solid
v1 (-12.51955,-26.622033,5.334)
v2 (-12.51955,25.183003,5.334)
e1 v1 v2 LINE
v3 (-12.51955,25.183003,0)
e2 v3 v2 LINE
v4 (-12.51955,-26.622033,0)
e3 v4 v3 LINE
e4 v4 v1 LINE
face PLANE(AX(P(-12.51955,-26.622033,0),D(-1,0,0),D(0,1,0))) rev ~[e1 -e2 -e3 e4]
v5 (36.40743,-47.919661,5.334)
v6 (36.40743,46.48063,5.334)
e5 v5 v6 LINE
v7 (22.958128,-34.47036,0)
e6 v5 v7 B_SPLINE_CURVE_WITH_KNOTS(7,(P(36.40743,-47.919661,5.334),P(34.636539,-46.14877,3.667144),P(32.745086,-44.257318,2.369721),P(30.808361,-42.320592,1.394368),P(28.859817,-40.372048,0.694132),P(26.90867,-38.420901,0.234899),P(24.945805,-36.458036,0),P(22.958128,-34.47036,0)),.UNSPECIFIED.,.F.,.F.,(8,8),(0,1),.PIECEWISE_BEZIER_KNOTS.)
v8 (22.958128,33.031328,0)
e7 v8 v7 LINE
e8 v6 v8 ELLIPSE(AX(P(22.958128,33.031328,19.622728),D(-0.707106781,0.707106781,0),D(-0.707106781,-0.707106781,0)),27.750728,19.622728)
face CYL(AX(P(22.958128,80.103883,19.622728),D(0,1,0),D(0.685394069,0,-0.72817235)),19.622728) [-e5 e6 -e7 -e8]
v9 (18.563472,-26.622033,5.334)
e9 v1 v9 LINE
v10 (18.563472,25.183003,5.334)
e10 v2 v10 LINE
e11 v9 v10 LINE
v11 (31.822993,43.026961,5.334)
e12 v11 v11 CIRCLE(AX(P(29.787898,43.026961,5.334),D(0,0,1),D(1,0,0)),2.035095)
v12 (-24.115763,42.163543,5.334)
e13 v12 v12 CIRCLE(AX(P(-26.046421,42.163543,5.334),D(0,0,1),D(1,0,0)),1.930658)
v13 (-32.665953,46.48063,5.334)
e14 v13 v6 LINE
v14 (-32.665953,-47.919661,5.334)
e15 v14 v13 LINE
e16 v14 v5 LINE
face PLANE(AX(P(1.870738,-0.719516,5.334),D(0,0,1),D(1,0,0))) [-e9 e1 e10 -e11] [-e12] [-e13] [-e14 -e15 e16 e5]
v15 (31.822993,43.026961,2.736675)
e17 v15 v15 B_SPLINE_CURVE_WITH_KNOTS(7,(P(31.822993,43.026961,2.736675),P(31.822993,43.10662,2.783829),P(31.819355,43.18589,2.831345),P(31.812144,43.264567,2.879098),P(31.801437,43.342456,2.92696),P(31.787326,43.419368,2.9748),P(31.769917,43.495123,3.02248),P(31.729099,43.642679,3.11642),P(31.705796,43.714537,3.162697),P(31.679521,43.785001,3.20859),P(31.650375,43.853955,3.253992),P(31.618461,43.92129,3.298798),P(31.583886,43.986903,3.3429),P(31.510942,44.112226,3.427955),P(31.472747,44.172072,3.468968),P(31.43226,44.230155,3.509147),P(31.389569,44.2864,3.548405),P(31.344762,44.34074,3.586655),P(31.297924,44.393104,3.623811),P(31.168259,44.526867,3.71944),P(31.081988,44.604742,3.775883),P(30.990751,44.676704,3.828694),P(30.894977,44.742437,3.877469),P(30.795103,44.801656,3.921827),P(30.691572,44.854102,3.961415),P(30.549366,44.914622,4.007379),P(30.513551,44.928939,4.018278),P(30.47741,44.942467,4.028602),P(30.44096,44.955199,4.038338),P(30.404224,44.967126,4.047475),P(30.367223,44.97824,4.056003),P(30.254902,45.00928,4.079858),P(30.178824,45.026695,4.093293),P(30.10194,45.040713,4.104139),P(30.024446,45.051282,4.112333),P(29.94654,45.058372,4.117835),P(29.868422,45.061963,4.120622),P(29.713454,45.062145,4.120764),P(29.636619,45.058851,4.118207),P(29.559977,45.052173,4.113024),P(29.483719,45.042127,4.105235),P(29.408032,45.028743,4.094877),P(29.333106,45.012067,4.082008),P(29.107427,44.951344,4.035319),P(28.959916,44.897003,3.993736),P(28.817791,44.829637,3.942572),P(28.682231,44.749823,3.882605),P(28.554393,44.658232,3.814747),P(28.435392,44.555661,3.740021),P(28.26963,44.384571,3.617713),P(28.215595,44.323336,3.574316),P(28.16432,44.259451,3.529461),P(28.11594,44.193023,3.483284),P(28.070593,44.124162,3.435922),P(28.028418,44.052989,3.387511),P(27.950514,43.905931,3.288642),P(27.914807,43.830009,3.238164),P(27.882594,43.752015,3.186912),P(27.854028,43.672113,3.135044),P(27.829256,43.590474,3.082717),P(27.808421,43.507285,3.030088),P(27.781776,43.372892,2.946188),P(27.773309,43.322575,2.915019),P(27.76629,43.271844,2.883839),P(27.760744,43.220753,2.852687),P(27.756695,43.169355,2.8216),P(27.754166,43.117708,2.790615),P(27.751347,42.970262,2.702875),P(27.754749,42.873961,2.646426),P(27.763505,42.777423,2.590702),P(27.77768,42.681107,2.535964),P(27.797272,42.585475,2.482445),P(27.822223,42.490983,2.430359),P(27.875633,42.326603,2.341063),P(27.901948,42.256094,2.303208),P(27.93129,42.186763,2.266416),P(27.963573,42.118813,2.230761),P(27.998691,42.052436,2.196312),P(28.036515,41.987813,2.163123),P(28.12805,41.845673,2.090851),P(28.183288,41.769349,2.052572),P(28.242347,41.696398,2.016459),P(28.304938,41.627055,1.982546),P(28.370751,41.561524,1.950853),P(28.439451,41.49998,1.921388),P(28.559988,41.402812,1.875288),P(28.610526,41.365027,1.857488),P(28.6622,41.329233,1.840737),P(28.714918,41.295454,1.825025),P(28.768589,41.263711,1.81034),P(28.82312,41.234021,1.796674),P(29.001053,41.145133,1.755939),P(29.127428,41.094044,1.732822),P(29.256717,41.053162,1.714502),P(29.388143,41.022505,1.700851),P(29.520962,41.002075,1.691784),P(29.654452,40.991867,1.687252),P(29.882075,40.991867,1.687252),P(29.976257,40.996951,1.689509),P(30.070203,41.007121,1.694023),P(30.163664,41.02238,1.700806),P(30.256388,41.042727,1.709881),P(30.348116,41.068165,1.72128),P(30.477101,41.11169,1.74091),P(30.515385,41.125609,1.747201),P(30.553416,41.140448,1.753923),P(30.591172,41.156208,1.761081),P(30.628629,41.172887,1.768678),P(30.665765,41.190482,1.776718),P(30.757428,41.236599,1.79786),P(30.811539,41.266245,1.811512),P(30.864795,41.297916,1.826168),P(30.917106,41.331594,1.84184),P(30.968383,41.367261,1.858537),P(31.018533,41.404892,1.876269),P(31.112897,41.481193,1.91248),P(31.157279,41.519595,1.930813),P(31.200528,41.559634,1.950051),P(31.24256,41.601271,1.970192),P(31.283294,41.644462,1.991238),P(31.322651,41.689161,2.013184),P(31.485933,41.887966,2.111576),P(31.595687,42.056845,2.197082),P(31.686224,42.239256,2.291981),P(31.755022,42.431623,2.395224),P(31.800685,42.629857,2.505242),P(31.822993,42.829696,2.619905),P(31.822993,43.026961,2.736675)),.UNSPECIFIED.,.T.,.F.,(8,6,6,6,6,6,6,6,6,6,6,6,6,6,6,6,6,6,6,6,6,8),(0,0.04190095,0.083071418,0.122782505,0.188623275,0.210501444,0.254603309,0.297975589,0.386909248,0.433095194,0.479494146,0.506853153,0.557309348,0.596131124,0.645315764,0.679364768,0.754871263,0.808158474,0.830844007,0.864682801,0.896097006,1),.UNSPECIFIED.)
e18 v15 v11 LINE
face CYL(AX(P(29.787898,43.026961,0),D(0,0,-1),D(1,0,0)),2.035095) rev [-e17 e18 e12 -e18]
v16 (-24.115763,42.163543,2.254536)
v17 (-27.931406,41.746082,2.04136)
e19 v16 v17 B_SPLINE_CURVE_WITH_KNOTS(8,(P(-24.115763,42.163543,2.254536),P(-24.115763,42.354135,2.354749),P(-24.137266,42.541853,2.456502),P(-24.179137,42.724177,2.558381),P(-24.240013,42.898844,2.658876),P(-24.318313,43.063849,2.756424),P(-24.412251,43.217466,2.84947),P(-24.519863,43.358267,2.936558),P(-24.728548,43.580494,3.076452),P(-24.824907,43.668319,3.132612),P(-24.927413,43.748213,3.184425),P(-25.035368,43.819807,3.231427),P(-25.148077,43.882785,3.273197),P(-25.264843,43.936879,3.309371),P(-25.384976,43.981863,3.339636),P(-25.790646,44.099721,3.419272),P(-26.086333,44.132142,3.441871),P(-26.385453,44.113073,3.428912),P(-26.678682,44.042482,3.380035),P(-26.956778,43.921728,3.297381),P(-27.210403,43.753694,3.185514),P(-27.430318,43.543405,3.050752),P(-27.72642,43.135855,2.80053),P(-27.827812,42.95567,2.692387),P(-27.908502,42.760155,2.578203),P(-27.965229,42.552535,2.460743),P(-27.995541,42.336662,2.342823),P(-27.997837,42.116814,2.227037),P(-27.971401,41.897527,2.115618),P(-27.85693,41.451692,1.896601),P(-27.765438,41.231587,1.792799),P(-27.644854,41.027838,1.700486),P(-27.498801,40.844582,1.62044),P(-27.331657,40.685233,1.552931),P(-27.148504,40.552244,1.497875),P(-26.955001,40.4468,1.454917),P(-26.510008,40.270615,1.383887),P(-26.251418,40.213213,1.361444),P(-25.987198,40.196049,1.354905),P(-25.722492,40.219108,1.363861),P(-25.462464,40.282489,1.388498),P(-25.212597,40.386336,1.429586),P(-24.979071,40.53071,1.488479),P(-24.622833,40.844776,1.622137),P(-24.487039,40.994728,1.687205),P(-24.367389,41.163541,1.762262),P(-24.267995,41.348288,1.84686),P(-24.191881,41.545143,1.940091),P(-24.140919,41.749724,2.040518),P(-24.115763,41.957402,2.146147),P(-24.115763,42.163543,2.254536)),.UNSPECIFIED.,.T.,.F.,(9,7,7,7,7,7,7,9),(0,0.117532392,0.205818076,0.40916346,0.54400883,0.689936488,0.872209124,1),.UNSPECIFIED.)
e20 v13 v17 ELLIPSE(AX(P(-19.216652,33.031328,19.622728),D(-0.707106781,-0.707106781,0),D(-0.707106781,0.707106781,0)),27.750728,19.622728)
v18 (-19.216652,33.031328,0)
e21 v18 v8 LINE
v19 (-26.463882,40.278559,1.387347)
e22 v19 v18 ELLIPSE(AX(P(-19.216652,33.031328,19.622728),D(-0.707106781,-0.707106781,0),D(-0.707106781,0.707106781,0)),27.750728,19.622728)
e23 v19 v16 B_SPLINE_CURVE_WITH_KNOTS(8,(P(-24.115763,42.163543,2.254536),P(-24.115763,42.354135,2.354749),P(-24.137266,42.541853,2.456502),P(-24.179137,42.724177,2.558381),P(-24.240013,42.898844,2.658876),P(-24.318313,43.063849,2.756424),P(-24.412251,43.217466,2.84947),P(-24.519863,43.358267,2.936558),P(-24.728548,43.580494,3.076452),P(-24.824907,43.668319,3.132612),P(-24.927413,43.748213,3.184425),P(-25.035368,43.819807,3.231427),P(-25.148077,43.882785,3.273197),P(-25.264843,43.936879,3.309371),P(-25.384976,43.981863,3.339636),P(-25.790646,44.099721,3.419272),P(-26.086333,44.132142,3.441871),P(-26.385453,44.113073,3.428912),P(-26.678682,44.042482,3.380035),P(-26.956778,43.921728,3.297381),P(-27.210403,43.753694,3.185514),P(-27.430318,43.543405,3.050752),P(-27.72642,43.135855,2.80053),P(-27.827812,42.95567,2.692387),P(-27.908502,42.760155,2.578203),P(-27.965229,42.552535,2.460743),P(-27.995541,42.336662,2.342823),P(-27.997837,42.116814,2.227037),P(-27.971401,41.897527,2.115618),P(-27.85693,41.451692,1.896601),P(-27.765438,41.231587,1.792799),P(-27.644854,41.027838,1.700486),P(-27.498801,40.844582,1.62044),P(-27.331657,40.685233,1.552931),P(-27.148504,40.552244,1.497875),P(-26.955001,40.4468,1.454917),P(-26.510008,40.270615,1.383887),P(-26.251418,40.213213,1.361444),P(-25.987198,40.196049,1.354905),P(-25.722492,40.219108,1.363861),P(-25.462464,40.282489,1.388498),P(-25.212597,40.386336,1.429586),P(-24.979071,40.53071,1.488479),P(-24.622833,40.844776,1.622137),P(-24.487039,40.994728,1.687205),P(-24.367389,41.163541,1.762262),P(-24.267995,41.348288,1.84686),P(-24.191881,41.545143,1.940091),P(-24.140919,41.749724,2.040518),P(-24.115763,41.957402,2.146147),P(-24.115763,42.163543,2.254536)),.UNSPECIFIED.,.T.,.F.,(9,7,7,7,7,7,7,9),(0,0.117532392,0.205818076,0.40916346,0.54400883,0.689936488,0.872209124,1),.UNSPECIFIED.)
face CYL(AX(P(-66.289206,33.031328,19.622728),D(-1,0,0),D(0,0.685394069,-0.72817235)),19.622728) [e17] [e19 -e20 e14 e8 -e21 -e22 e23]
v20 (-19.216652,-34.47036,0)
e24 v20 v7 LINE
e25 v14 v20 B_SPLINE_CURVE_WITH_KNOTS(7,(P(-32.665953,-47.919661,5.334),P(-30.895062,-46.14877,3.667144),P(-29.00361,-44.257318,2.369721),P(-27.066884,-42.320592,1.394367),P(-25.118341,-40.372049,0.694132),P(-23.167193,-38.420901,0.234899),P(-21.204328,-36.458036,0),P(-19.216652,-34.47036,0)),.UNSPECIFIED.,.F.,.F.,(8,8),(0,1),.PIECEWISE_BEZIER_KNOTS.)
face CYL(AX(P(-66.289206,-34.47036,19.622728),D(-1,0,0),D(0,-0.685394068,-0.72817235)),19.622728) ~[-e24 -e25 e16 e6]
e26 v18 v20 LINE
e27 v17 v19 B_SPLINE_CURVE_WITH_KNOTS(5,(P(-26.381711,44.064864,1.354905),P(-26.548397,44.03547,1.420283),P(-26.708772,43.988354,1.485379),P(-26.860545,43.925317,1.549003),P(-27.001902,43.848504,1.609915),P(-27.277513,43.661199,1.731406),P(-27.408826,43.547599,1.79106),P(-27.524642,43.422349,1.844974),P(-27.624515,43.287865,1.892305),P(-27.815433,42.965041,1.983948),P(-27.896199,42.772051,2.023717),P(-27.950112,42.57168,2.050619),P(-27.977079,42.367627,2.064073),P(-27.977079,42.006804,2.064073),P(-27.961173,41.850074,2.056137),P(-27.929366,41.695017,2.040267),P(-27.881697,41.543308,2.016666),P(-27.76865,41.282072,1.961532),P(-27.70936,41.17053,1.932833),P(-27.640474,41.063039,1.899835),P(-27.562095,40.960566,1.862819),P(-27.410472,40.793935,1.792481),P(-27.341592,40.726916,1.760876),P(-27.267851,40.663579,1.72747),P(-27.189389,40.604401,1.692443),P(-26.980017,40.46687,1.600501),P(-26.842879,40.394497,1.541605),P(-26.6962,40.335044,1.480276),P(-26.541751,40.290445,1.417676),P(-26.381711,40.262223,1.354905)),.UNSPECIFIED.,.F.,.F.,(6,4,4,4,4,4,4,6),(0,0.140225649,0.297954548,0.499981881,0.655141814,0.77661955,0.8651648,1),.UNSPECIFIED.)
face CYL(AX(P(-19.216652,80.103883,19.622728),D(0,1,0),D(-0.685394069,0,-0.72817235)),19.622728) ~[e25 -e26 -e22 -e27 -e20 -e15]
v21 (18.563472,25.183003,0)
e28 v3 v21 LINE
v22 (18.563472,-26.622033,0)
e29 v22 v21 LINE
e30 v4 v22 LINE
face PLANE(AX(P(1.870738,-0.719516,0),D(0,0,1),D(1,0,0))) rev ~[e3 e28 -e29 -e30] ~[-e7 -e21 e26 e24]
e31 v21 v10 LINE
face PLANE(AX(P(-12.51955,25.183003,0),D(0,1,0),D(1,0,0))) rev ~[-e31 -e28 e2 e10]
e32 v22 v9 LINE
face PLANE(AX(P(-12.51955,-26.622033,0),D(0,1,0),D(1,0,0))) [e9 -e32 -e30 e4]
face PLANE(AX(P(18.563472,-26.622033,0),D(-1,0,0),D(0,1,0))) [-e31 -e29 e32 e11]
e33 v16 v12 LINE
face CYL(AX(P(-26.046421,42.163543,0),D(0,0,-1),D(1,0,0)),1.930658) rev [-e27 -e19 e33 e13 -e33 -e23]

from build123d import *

# Parameters (mm, degrees)
F0_W        = 69.0733827651
F0_H        = 94.4002903998
F0_R        = 1.9306579711
F0_W_2      = 31.083021313
F0_H_2      = 51.8050361425
F0_R_2      = 2.0350948247
F1_DEPTH    = 5.334
F2_T1_DEPTH = 136.319889095
F2_T3_DEPTH = 161.6467967298


# Not quite as in the source:
# - a fillet or chamfer that OpenCascade refuses, or shapes differently, is made with other operations: its cross-section is extruded or revolved along the edge and cut away or added


with BuildPart() as f1:
    # F0 (on Top) → F1 (new body)
    with BuildSketch(Plane.XY):
        with Locations((1.8707383424, -0.7195156068)):
            Rectangle(F0_W, F0_H)
        with Locations((-26.0464213789, 42.1635434031)):
            Circle(F0_R, mode=Mode.SUBTRACT)
        with Locations((3.021961078, -0.7195146754)):
            Rectangle(F0_W_2, F0_H_2, mode=Mode.SUBTRACT)
        with Locations((29.7878980637, 43.0269613862)):
            Circle(F0_R_2, mode=Mode.SUBTRACT)
    extrude(amount=F1_DEPTH)

    # F2: fillet of radius 19.622727835 on 4 edges, made by hand

    # F2_s2 → F2_t1 (cut)
    with BuildSketch(Plane.YZ.offset(-66.2892062051)):
        with BuildLine():
            ThreePointArc((46.4806295931, 5.334), (40.2655397656, 1.3821787054), (33.0313283271, 0))
            Line((33.0313283271, 0), (46.4806295931, 0))
            Line((46.4806295931, 0), (46.4806295931, 5.334))
        make_face()
        with BuildLine():
            ThreePointArc((-47.9196608067, 5.334), (-41.7045709791, 1.3821787054), (-34.4703595407, 0))
            Line((-34.4703595407, 0), (-47.9196608067, 0))
            Line((-47.9196608067, 0), (-47.9196608067, 5.334))
        make_face()
    extrude(amount=F2_T1_DEPTH, mode=Mode.SUBTRACT)

    # F2_s4 → F2_t3 (cut)
    with BuildSketch(Plane.XZ.offset(-80.1038827581)):
        with BuildLine():
            ThreePointArc((36.4074297249, 5.334), (30.1923398974, 1.3821787054), (22.9581284589, 0))
            Line((22.9581284589, 0), (36.4074297249, 0))
            Line((36.4074297249, 0), (36.4074297249, 5.334))
        make_face()
        with BuildLine():
            ThreePointArc((-32.6659530401, 5.334), (-26.4508632126, 1.3821787054), (-19.2166517741, 0))
            Line((-19.2166517741, 0), (-32.6659530401, 0))
            Line((-32.6659530401, 0), (-32.6659530401, 5.334))
        make_face()
    extrude(amount=F2_T3_DEPTH, mode=Mode.SUBTRACT)


solid = f1.part
